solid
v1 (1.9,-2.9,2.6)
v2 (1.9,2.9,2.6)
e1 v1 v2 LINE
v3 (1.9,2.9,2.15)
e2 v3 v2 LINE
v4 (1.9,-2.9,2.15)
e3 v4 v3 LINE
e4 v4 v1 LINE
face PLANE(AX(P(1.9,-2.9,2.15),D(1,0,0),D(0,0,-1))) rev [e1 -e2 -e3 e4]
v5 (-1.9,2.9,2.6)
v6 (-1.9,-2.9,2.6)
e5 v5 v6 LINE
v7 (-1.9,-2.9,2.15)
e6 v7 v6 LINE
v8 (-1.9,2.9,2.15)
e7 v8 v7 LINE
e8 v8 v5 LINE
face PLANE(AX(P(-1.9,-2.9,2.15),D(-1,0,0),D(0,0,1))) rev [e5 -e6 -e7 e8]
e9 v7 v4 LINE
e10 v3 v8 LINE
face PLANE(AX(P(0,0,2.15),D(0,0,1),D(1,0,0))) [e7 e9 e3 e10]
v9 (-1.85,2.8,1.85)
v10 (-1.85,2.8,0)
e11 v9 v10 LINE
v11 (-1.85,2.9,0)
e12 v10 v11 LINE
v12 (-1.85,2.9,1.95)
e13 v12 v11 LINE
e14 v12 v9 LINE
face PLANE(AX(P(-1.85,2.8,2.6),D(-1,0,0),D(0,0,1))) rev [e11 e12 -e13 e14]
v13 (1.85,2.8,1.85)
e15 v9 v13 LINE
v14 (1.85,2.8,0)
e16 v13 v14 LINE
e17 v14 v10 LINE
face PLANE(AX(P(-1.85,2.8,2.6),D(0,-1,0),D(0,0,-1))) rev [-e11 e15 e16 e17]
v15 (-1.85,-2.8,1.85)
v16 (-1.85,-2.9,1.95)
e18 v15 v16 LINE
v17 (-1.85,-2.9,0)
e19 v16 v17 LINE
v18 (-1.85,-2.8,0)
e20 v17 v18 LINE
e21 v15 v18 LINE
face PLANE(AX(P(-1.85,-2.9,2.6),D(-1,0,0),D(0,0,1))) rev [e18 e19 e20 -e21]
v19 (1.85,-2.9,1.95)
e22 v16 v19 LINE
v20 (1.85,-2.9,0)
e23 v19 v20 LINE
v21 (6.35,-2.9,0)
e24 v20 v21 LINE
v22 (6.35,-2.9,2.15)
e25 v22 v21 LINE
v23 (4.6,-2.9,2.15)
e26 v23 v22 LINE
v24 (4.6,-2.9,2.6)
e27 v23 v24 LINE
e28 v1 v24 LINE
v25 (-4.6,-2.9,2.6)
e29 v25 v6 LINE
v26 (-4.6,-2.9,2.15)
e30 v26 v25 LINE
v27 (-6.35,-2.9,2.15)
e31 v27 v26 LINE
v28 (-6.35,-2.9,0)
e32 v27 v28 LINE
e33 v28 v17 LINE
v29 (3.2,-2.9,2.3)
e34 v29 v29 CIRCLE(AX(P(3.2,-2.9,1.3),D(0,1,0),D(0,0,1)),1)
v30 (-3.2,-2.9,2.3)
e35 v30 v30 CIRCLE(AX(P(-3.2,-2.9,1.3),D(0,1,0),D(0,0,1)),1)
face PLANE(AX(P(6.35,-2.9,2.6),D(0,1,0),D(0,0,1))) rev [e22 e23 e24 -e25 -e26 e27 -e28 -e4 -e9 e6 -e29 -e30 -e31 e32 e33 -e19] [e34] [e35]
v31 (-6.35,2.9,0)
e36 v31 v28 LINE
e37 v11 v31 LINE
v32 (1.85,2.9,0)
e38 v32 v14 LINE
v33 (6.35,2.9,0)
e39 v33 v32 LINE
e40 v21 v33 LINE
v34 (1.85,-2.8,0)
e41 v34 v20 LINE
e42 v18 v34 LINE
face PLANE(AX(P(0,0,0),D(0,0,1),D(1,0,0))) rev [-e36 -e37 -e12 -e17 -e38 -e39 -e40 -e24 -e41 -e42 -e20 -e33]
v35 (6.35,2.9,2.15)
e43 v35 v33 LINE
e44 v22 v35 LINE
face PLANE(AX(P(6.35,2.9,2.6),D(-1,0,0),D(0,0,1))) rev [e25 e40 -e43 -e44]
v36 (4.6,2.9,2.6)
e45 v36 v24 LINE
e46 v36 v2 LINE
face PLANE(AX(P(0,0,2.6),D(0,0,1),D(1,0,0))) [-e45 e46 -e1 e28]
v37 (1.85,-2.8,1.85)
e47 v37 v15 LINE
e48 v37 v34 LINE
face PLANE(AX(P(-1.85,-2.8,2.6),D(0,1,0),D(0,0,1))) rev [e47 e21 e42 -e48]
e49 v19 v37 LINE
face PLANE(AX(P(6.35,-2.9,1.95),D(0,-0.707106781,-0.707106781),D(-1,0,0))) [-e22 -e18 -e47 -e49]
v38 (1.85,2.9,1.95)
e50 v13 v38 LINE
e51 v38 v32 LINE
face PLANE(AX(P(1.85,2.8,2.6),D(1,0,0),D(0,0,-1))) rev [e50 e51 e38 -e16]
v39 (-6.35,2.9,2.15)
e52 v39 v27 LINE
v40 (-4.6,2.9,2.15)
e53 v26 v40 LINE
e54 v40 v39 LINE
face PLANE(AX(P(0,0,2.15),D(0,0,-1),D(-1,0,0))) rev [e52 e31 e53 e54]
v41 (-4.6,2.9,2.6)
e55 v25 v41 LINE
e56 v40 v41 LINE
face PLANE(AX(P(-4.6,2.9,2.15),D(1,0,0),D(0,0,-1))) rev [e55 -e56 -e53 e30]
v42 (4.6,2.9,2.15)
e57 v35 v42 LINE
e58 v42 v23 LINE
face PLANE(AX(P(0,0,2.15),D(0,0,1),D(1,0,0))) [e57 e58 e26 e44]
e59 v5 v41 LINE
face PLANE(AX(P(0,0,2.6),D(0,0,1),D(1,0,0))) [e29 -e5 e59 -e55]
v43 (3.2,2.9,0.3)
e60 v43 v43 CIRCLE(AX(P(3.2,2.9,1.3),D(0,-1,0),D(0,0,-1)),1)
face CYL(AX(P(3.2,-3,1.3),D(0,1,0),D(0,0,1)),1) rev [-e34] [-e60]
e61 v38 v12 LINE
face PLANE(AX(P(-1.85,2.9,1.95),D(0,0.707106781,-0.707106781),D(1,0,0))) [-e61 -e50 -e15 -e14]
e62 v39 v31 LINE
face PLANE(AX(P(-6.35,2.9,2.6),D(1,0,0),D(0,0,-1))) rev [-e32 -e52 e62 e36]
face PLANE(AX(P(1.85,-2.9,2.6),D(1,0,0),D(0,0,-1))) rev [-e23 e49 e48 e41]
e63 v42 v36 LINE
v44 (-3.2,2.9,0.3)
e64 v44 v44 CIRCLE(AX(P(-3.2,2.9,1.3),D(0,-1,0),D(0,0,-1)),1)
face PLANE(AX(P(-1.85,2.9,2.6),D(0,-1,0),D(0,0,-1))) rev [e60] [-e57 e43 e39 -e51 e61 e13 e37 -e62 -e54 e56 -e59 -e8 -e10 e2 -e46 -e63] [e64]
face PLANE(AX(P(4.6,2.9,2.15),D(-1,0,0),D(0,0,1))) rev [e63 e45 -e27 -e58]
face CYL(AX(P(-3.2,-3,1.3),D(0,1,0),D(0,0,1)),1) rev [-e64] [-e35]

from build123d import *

# Parameters (mm, degrees)
SALIENTE_EXTRUIR1_DEPTH = 2.6
CROQUIS2_R              = 1
CORTAR_EXTRUIR1_DEPTH   = 3
CROQUIS4_W              = 3.7
CROQUIS4_H              = 0.1
SALIENTE_EXTRUIR2_DEPTH = 0.8
CHAFL_N1_SIZE           = 0.15
CROQUIS5_W              = 3.8
CROQUIS5_H              = 5.8
CROQUIS5_W_2            = 1.75
CORTAR_EXTRUIR2_DEPTH   = 0.45


with BuildPart() as part:
    # Croquis1 → Saliente-Extruir1 (new body)
    with BuildSketch(Plane.XY):
        Polygon((-1.85, 2.8), (1.85, 2.8), (1.85, 2.9), (6.35, 2.9), (6.35, -2.9), (1.85, -2.9), (1.85, -2.8), (-1.85, -2.8), (-1.85, -2.9), (-6.35, -2.9), (-6.35, 2.9), (-1.85, 2.9), align=None)
    extrude(amount=SALIENTE_EXTRUIR1_DEPTH)

    # Croquis2 → Cortar-Extruir1 (cut, symmetric)
    with BuildSketch(Plane(origin=(0, 0, 0), x_dir=(1, 0, 0), z_dir=(0, 1, 0))):
        with Locations(Location((-3.2, -1.3, 0), (0, 0, 270))):
            Circle(CROQUIS2_R)
        with Locations(Location((3.2, -1.3, 0), (0, 0, 270))):
            Circle(CROQUIS2_R)
    extrude(amount=CORTAR_EXTRUIR1_DEPTH, both=True, mode=Mode.SUBTRACT)

    # Croquis4 → Saliente-Extruir2 (add)
    with BuildSketch(Plane.XY.offset(2.6)):
        with Locations((0, 2.85)):
            Rectangle(CROQUIS4_W, CROQUIS4_H)
        with Locations((0, -2.85)):
            Rectangle(CROQUIS4_W, CROQUIS4_H)
    extrude(amount=-SALIENTE_EXTRUIR2_DEPTH)

    # Chaflán1
    # the kernel refuses this chamfer: 0.15 mm, written as the material it takes off along each edge
    with BuildSketch(Plane(origin=(-1.85, -2.9, 1.8), x_dir=(0, -0.027495876610587378, 0.9996219169112965), z_dir=(1, 0, 0))) as chafl_n1_piece_1_section:
        Polygon((CHAFL_N1_SIZE * 0.999621916911, -CHAFL_N1_SIZE * 0.0274958766106), (-CHAFL_N1_SIZE * 0.0274958766106, -CHAFL_N1_SIZE * 0.999621916911), (0, 0), align=None)
    chafl_n1_piece_1 = extrude(amount=3.7, mode=Mode.PRIVATE)
    chafl_n1_piece_1 = split(chafl_n1_piece_1, bisect_by=Plane(origin=(0, -2.8, 1.85460455), z_dir=(0, -1, 0)), keep=Keep.TOP, mode=Mode.PRIVATE)
    add(chafl_n1_piece_1, mode=Mode.SUBTRACT)
    with BuildSketch(Plane(origin=(1.85, 2.9, 1.8), x_dir=(0, 0.027495876610587378, 0.9996219169112965), z_dir=(-1, 0, 0))) as chafl_n1_piece_2_section:
        Polygon((CHAFL_N1_SIZE * 0.999621916911, -CHAFL_N1_SIZE * 0.0274958766106), (-CHAFL_N1_SIZE * 0.0274958766106, -CHAFL_N1_SIZE * 0.999621916911), (0, 0), align=None)
    chafl_n1_piece_2 = extrude(amount=3.7, mode=Mode.PRIVATE)
    chafl_n1_piece_2 = split(chafl_n1_piece_2, bisect_by=Plane(origin=(0, 2.8, 1.85460455), z_dir=(0, 1, 0)), keep=Keep.TOP, mode=Mode.PRIVATE)
    add(chafl_n1_piece_2, mode=Mode.SUBTRACT)

    # Croquis5 → Cortar-Extruir2 (cut)
    with BuildSketch(Plane.XY.offset(2.6)):
        Rectangle(CROQUIS5_W, CROQUIS5_H)
        with Locations((-5.475, 0)):
            Rectangle(CROQUIS5_W_2, CROQUIS5_H)
        with Locations((5.475, 0)):
            Rectangle(CROQUIS5_W_2, CROQUIS5_H)
    extrude(amount=-CORTAR_EXTRUIR2_DEPTH, mode=Mode.SUBTRACT)


solid = part.part
